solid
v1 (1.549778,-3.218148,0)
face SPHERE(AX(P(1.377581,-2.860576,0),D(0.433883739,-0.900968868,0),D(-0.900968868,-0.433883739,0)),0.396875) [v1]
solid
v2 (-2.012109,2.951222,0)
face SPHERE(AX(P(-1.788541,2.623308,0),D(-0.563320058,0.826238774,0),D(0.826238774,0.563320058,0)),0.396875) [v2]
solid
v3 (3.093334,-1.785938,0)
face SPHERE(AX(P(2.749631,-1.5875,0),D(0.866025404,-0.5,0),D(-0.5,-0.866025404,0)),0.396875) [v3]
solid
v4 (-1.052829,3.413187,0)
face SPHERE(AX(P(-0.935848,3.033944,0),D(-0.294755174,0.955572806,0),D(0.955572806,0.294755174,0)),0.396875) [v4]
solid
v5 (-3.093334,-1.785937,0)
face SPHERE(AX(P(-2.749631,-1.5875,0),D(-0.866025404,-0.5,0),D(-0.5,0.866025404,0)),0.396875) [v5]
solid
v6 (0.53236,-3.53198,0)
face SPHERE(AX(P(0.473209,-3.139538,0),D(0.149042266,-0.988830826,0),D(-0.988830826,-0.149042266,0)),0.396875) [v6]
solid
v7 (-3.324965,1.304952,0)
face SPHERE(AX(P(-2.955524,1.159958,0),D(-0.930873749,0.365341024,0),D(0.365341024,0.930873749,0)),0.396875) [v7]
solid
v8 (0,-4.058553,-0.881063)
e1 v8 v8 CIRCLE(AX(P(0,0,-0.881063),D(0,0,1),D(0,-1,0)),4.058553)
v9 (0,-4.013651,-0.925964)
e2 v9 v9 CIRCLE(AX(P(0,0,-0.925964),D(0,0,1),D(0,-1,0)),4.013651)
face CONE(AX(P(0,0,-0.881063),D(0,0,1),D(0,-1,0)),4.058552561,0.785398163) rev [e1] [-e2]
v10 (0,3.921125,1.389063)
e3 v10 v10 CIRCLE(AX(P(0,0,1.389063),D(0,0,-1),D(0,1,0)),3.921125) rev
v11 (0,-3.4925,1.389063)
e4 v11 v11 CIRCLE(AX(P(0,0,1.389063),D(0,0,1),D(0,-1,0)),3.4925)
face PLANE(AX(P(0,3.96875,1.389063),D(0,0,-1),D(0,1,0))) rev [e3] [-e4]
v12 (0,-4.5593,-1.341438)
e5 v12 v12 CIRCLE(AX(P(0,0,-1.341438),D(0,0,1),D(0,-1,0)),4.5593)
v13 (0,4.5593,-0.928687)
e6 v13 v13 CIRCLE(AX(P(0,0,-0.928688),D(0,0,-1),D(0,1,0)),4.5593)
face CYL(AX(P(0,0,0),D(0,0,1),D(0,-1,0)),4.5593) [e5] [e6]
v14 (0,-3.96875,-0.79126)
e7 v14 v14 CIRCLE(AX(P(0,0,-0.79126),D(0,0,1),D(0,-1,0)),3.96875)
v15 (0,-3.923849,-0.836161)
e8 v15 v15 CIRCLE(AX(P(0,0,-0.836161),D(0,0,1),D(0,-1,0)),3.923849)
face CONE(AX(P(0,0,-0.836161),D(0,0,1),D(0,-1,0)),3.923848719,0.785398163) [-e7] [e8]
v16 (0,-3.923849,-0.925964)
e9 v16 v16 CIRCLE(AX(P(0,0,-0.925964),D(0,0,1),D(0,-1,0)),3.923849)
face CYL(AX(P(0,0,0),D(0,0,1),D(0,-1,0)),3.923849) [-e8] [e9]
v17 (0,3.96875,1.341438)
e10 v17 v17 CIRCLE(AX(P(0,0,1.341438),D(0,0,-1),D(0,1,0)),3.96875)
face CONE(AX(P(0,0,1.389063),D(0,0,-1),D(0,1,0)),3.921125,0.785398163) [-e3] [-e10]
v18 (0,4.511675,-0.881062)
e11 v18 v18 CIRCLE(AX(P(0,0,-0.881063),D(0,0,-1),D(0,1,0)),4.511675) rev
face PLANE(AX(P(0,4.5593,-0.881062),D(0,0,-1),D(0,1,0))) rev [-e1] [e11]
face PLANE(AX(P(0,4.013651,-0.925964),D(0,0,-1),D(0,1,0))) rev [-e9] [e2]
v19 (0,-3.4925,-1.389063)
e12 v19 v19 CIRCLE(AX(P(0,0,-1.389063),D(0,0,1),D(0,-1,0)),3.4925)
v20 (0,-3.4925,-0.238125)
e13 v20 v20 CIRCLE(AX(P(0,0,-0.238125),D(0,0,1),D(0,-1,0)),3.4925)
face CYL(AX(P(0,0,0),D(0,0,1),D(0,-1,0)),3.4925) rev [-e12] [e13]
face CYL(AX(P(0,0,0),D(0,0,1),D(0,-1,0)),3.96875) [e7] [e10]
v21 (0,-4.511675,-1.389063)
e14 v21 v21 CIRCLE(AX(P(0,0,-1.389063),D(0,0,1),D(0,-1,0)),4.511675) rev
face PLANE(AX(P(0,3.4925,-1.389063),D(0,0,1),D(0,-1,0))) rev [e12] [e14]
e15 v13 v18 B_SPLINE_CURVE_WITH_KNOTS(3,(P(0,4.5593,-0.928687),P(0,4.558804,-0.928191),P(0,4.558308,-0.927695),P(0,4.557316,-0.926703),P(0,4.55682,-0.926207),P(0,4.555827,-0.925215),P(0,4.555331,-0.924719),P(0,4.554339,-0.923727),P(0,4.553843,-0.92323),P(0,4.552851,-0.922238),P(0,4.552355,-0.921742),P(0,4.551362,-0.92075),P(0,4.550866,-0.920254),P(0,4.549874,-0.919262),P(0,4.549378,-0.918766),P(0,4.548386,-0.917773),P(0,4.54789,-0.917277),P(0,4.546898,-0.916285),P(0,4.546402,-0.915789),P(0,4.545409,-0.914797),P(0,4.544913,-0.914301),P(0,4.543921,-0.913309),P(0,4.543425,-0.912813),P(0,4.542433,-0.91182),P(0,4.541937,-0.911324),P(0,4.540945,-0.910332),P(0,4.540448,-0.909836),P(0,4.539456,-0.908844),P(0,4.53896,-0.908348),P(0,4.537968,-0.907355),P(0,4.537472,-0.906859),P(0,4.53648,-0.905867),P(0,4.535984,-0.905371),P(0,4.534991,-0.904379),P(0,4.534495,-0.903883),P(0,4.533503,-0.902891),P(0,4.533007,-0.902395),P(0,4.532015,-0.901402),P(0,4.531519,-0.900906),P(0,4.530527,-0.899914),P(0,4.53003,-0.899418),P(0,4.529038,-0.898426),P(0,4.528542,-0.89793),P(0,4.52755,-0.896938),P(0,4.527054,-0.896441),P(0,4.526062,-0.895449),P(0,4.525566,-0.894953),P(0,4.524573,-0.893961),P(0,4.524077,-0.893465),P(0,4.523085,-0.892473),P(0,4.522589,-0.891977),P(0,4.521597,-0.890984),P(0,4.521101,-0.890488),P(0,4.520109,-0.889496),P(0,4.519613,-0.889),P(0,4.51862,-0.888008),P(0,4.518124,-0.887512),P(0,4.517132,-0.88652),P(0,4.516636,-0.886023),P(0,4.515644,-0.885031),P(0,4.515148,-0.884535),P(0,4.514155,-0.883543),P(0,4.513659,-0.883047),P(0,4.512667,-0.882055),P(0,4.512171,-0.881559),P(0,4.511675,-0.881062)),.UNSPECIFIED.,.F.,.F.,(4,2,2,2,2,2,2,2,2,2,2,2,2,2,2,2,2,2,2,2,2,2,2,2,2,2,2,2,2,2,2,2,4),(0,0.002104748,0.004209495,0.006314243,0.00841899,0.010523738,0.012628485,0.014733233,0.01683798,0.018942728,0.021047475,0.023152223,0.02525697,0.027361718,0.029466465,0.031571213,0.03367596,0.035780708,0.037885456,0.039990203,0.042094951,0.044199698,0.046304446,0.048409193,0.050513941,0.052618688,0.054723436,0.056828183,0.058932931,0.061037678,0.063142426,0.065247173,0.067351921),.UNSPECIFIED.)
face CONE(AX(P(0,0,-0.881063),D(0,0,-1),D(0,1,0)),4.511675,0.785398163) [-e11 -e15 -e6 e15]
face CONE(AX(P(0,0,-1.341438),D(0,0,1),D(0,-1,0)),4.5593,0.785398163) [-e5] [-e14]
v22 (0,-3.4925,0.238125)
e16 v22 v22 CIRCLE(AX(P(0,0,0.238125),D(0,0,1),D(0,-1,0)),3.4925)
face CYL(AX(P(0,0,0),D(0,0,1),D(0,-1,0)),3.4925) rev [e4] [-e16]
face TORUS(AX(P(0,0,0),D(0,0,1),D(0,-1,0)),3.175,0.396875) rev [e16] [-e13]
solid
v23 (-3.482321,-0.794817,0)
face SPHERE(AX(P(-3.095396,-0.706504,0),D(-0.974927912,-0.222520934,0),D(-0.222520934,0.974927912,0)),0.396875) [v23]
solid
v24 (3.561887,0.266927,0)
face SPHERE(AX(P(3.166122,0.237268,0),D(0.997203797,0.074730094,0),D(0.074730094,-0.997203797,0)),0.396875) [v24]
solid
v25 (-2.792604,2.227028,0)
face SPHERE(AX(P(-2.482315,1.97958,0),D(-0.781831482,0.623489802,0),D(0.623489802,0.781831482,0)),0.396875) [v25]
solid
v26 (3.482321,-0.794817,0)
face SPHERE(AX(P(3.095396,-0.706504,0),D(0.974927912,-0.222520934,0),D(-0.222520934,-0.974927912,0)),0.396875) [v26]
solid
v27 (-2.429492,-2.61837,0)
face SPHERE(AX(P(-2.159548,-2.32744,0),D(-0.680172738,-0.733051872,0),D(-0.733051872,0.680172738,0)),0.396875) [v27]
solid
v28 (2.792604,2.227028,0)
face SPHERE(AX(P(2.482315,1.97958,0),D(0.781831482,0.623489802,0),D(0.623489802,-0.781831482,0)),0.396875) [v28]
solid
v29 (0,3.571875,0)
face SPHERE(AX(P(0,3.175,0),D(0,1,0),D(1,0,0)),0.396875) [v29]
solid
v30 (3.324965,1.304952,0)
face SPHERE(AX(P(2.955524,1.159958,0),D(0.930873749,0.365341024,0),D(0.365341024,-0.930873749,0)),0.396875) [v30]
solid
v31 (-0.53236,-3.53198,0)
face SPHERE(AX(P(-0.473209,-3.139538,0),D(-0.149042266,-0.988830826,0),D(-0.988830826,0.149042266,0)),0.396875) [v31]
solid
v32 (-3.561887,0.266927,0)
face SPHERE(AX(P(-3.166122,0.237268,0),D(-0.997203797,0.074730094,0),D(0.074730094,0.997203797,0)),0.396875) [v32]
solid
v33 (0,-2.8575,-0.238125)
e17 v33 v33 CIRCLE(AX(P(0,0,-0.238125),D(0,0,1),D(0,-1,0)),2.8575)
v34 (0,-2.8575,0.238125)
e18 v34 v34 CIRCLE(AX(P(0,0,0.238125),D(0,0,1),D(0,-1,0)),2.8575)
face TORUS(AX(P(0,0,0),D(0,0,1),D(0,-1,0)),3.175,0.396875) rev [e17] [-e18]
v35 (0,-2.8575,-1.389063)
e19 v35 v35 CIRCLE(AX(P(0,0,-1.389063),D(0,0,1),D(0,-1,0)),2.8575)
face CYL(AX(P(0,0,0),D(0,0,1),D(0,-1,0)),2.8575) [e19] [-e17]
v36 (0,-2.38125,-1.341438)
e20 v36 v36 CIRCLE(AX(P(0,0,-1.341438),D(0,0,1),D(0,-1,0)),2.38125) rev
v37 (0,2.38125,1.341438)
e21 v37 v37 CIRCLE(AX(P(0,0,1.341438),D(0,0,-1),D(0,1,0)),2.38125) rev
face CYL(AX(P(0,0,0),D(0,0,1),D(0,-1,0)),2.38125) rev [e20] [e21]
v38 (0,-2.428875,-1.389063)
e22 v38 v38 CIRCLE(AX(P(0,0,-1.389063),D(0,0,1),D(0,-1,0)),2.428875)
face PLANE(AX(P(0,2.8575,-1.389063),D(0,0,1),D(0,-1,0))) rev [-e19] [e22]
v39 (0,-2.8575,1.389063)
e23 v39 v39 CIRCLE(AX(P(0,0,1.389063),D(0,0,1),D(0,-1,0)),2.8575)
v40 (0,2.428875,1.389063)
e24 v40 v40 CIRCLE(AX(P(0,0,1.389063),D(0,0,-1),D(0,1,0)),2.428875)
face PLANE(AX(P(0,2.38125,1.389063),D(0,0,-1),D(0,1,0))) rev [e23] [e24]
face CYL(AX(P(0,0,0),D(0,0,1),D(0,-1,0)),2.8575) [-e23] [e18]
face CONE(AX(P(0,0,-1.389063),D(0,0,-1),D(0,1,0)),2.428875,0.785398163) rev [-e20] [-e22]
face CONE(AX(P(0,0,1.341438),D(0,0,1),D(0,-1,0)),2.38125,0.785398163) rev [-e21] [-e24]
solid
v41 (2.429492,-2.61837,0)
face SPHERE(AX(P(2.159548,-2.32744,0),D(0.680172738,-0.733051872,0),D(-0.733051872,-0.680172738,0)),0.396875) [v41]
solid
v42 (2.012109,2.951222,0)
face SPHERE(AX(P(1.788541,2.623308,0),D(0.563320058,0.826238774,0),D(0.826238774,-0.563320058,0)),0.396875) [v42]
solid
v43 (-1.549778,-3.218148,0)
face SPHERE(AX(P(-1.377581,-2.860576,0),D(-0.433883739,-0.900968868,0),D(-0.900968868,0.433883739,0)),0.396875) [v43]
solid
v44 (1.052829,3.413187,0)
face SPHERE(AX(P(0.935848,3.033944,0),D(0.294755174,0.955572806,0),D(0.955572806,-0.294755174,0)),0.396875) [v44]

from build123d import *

# Parameters (mm, degrees)
FILLET1_SIZE      = 0.047625
FILLET2_SIZE      = 0.047625
CIRPATTERN3_COUNT = 21


with BuildPart() as part:
    # Sketch2 → Revolve1 (revolve)
    with BuildSketch(Plane(origin=(0, 0, 0), x_dir=(0, 0, -1), z_dir=(1, 0, 0))):
        with BuildLine():
            Line((1.3890625, 4.5593), (0.8810625, 4.5593))
            Line((0.8810625, 4.5593), (0.8810625, 4.058552561))
            Line((0.8810625, 4.058552561), (0.925963781, 4.013651281))
            Line((0.925963781, 4.013651281), (0.925963781, 3.923848719))
            Line((0.925963781, 3.923848719), (0.836161219, 3.923848719))
            Line((0.836161219, 3.923848719), (0.791259939, 3.96875))
            Line((0.791259939, 3.96875), (-1.3890625, 3.96875))
            Line((-1.3890625, 3.96875), (-1.3890625, 3.4925))
            Line((-1.3890625, 3.4925), (-0.238125, 3.4925))
            ThreePointArc((-0.238125, 3.4925), (0, 3.571875), (0.238125, 3.4925))
            Line((0.238125, 3.4925), (1.3890625, 3.4925))
            Line((1.3890625, 3.4925), (1.3890625, 4.5593))
        make_face()
        with BuildLine():
            Line((1.3890625, 2.38125), (-1.3890625, 2.38125))
            Line((-1.3890625, 2.38125), (-1.3890625, 2.8575))
            Line((-1.3890625, 2.8575), (-0.238125, 2.8575))
            ThreePointArc((-0.238125, 2.8575), (0, 2.778125), (0.238125, 2.8575))
            Line((0.238125, 2.8575), (1.3890625, 2.8575))
            Line((1.3890625, 2.8575), (1.3890625, 2.38125))
        make_face()
    revolve(axis=Axis((0, 0, 0), (0, 0, -1)))

    # Fillet1
    fillet1_edges = [part.edges().sort_by_distance(p)[0] for p in [
        (0, -4.5593, -1.3890625),
        (0, -4.5593, -0.8810625),
        (0, -3.96875, 1.3890625),
    ]]
    chamfer(fillet1_edges, length=FILLET1_SIZE)

    # Fillet2
    fillet2_edges = [part.edges().sort_by_distance(p)[0] for p in [
        (0, -2.38125, -1.3890625),
        (0, -2.38125, 1.3890625),
    ]]
    chamfer(fillet2_edges, length=FILLET2_SIZE)


with BuildPart() as body_2:
    # Sketch7 → Revolve3 (revolve)
    with BuildSketch(Plane.XY):
        with BuildLine():
            Line((0, 3.571875), (0, 2.778125))
            ThreePointArc((0, 2.778125), (-0.396875, 3.175), (0, 3.571875))
        make_face()
    revolve(axis=Axis((0, 3.571875, 0), (0, -1, 0)))


with BuildPart() as cirpattern3_1:
    # CirPattern3: pattern copy
    add(body_2.part.rotate(Axis((0, 0, 0), (0, 0, -1)), 1 * 360 / CIRPATTERN3_COUNT))


with BuildPart() as cirpattern3_2:
    # CirPattern3: pattern copy
    add(body_2.part.rotate(Axis((0, 0, 0), (0, 0, -1)), 2 * 360 / CIRPATTERN3_COUNT))


with BuildPart() as cirpattern3_3:
    # CirPattern3: pattern copy
    add(body_2.part.rotate(Axis((0, 0, 0), (0, 0, -1)), 3 * 360 / CIRPATTERN3_COUNT))


with BuildPart() as cirpattern3_4:
    # CirPattern3: pattern copy
    add(body_2.part.rotate(Axis((0, 0, 0), (0, 0, -1)), 4 * 360 / CIRPATTERN3_COUNT))


with BuildPart() as cirpattern3_5:
    # CirPattern3: pattern copy
    add(body_2.part.rotate(Axis((0, 0, 0), (0, 0, -1)), 5 * 360 / CIRPATTERN3_COUNT))


with BuildPart() as cirpattern3_6:
    # CirPattern3: pattern copy
    add(body_2.part.rotate(Axis((0, 0, 0), (0, 0, -1)), 6 * 360 / CIRPATTERN3_COUNT))


with BuildPart() as cirpattern3_7:
    # CirPattern3: pattern copy
    add(body_2.part.rotate(Axis((0, 0, 0), (0, 0, -1)), 7 * 360 / CIRPATTERN3_COUNT))


with BuildPart() as cirpattern3_8:
    # CirPattern3: pattern copy
    add(body_2.part.rotate(Axis((0, 0, 0), (0, 0, -1)), 8 * 360 / CIRPATTERN3_COUNT))


with BuildPart() as cirpattern3_9:
    # CirPattern3: pattern copy
    add(body_2.part.rotate(Axis((0, 0, 0), (0, 0, -1)), 9 * 360 / CIRPATTERN3_COUNT))


with BuildPart() as cirpattern3_10:
    # CirPattern3: pattern copy
    add(body_2.part.rotate(Axis((0, 0, 0), (0, 0, -1)), 10 * 360 / CIRPATTERN3_COUNT))


with BuildPart() as cirpattern3_11:
    # CirPattern3: pattern copy
    add(body_2.part.rotate(Axis((0, 0, 0), (0, 0, -1)), 11 * 360 / CIRPATTERN3_COUNT))


with BuildPart() as cirpattern3_12:
    # CirPattern3: pattern copy
    add(body_2.part.rotate(Axis((0, 0, 0), (0, 0, -1)), 12 * 360 / CIRPATTERN3_COUNT))


with BuildPart() as cirpattern3_13:
    # CirPattern3: pattern copy
    add(body_2.part.rotate(Axis((0, 0, 0), (0, 0, -1)), 13 * 360 / CIRPATTERN3_COUNT))


with BuildPart() as cirpattern3_14:
    # CirPattern3: pattern copy
    add(body_2.part.rotate(Axis((0, 0, 0), (0, 0, -1)), 14 * 360 / CIRPATTERN3_COUNT))


with BuildPart() as cirpattern3_15:
    # CirPattern3: pattern copy
    add(body_2.part.rotate(Axis((0, 0, 0), (0, 0, -1)), 15 * 360 / CIRPATTERN3_COUNT))


with BuildPart() as cirpattern3_16:
    # CirPattern3: pattern copy
    add(body_2.part.rotate(Axis((0, 0, 0), (0, 0, -1)), 16 * 360 / CIRPATTERN3_COUNT))


with BuildPart() as cirpattern3_17:
    # CirPattern3: pattern copy
    add(body_2.part.rotate(Axis((0, 0, 0), (0, 0, -1)), 17 * 360 / CIRPATTERN3_COUNT))


with BuildPart() as cirpattern3_18:
    # CirPattern3: pattern copy
    add(body_2.part.rotate(Axis((0, 0, 0), (0, 0, -1)), 18 * 360 / CIRPATTERN3_COUNT))


with BuildPart() as cirpattern3_19:
    # CirPattern3: pattern copy
    add(body_2.part.rotate(Axis((0, 0, 0), (0, 0, -1)), 19 * 360 / CIRPATTERN3_COUNT))


with BuildPart() as cirpattern3_20:
    # CirPattern3: pattern copy
    add(body_2.part.rotate(Axis((0, 0, 0), (0, 0, -1)), 20 * 360 / CIRPATTERN3_COUNT))


solid = Compound([part.part, body_2.part, cirpattern3_1.part, cirpattern3_2.part, cirpattern3_3.part, cirpattern3_4.part, cirpattern3_5.part, cirpattern3_6.part, cirpattern3_7.part, cirpattern3_8.part, cirpattern3_9.part, cirpattern3_10.part, cirpattern3_11.part, cirpattern3_12.part, cirpattern3_13.part, cirpattern3_14.part, cirpattern3_15.part, cirpattern3_16.part, cirpattern3_17.part, cirpattern3_18.part, cirpattern3_19.part, cirpattern3_20.part])
